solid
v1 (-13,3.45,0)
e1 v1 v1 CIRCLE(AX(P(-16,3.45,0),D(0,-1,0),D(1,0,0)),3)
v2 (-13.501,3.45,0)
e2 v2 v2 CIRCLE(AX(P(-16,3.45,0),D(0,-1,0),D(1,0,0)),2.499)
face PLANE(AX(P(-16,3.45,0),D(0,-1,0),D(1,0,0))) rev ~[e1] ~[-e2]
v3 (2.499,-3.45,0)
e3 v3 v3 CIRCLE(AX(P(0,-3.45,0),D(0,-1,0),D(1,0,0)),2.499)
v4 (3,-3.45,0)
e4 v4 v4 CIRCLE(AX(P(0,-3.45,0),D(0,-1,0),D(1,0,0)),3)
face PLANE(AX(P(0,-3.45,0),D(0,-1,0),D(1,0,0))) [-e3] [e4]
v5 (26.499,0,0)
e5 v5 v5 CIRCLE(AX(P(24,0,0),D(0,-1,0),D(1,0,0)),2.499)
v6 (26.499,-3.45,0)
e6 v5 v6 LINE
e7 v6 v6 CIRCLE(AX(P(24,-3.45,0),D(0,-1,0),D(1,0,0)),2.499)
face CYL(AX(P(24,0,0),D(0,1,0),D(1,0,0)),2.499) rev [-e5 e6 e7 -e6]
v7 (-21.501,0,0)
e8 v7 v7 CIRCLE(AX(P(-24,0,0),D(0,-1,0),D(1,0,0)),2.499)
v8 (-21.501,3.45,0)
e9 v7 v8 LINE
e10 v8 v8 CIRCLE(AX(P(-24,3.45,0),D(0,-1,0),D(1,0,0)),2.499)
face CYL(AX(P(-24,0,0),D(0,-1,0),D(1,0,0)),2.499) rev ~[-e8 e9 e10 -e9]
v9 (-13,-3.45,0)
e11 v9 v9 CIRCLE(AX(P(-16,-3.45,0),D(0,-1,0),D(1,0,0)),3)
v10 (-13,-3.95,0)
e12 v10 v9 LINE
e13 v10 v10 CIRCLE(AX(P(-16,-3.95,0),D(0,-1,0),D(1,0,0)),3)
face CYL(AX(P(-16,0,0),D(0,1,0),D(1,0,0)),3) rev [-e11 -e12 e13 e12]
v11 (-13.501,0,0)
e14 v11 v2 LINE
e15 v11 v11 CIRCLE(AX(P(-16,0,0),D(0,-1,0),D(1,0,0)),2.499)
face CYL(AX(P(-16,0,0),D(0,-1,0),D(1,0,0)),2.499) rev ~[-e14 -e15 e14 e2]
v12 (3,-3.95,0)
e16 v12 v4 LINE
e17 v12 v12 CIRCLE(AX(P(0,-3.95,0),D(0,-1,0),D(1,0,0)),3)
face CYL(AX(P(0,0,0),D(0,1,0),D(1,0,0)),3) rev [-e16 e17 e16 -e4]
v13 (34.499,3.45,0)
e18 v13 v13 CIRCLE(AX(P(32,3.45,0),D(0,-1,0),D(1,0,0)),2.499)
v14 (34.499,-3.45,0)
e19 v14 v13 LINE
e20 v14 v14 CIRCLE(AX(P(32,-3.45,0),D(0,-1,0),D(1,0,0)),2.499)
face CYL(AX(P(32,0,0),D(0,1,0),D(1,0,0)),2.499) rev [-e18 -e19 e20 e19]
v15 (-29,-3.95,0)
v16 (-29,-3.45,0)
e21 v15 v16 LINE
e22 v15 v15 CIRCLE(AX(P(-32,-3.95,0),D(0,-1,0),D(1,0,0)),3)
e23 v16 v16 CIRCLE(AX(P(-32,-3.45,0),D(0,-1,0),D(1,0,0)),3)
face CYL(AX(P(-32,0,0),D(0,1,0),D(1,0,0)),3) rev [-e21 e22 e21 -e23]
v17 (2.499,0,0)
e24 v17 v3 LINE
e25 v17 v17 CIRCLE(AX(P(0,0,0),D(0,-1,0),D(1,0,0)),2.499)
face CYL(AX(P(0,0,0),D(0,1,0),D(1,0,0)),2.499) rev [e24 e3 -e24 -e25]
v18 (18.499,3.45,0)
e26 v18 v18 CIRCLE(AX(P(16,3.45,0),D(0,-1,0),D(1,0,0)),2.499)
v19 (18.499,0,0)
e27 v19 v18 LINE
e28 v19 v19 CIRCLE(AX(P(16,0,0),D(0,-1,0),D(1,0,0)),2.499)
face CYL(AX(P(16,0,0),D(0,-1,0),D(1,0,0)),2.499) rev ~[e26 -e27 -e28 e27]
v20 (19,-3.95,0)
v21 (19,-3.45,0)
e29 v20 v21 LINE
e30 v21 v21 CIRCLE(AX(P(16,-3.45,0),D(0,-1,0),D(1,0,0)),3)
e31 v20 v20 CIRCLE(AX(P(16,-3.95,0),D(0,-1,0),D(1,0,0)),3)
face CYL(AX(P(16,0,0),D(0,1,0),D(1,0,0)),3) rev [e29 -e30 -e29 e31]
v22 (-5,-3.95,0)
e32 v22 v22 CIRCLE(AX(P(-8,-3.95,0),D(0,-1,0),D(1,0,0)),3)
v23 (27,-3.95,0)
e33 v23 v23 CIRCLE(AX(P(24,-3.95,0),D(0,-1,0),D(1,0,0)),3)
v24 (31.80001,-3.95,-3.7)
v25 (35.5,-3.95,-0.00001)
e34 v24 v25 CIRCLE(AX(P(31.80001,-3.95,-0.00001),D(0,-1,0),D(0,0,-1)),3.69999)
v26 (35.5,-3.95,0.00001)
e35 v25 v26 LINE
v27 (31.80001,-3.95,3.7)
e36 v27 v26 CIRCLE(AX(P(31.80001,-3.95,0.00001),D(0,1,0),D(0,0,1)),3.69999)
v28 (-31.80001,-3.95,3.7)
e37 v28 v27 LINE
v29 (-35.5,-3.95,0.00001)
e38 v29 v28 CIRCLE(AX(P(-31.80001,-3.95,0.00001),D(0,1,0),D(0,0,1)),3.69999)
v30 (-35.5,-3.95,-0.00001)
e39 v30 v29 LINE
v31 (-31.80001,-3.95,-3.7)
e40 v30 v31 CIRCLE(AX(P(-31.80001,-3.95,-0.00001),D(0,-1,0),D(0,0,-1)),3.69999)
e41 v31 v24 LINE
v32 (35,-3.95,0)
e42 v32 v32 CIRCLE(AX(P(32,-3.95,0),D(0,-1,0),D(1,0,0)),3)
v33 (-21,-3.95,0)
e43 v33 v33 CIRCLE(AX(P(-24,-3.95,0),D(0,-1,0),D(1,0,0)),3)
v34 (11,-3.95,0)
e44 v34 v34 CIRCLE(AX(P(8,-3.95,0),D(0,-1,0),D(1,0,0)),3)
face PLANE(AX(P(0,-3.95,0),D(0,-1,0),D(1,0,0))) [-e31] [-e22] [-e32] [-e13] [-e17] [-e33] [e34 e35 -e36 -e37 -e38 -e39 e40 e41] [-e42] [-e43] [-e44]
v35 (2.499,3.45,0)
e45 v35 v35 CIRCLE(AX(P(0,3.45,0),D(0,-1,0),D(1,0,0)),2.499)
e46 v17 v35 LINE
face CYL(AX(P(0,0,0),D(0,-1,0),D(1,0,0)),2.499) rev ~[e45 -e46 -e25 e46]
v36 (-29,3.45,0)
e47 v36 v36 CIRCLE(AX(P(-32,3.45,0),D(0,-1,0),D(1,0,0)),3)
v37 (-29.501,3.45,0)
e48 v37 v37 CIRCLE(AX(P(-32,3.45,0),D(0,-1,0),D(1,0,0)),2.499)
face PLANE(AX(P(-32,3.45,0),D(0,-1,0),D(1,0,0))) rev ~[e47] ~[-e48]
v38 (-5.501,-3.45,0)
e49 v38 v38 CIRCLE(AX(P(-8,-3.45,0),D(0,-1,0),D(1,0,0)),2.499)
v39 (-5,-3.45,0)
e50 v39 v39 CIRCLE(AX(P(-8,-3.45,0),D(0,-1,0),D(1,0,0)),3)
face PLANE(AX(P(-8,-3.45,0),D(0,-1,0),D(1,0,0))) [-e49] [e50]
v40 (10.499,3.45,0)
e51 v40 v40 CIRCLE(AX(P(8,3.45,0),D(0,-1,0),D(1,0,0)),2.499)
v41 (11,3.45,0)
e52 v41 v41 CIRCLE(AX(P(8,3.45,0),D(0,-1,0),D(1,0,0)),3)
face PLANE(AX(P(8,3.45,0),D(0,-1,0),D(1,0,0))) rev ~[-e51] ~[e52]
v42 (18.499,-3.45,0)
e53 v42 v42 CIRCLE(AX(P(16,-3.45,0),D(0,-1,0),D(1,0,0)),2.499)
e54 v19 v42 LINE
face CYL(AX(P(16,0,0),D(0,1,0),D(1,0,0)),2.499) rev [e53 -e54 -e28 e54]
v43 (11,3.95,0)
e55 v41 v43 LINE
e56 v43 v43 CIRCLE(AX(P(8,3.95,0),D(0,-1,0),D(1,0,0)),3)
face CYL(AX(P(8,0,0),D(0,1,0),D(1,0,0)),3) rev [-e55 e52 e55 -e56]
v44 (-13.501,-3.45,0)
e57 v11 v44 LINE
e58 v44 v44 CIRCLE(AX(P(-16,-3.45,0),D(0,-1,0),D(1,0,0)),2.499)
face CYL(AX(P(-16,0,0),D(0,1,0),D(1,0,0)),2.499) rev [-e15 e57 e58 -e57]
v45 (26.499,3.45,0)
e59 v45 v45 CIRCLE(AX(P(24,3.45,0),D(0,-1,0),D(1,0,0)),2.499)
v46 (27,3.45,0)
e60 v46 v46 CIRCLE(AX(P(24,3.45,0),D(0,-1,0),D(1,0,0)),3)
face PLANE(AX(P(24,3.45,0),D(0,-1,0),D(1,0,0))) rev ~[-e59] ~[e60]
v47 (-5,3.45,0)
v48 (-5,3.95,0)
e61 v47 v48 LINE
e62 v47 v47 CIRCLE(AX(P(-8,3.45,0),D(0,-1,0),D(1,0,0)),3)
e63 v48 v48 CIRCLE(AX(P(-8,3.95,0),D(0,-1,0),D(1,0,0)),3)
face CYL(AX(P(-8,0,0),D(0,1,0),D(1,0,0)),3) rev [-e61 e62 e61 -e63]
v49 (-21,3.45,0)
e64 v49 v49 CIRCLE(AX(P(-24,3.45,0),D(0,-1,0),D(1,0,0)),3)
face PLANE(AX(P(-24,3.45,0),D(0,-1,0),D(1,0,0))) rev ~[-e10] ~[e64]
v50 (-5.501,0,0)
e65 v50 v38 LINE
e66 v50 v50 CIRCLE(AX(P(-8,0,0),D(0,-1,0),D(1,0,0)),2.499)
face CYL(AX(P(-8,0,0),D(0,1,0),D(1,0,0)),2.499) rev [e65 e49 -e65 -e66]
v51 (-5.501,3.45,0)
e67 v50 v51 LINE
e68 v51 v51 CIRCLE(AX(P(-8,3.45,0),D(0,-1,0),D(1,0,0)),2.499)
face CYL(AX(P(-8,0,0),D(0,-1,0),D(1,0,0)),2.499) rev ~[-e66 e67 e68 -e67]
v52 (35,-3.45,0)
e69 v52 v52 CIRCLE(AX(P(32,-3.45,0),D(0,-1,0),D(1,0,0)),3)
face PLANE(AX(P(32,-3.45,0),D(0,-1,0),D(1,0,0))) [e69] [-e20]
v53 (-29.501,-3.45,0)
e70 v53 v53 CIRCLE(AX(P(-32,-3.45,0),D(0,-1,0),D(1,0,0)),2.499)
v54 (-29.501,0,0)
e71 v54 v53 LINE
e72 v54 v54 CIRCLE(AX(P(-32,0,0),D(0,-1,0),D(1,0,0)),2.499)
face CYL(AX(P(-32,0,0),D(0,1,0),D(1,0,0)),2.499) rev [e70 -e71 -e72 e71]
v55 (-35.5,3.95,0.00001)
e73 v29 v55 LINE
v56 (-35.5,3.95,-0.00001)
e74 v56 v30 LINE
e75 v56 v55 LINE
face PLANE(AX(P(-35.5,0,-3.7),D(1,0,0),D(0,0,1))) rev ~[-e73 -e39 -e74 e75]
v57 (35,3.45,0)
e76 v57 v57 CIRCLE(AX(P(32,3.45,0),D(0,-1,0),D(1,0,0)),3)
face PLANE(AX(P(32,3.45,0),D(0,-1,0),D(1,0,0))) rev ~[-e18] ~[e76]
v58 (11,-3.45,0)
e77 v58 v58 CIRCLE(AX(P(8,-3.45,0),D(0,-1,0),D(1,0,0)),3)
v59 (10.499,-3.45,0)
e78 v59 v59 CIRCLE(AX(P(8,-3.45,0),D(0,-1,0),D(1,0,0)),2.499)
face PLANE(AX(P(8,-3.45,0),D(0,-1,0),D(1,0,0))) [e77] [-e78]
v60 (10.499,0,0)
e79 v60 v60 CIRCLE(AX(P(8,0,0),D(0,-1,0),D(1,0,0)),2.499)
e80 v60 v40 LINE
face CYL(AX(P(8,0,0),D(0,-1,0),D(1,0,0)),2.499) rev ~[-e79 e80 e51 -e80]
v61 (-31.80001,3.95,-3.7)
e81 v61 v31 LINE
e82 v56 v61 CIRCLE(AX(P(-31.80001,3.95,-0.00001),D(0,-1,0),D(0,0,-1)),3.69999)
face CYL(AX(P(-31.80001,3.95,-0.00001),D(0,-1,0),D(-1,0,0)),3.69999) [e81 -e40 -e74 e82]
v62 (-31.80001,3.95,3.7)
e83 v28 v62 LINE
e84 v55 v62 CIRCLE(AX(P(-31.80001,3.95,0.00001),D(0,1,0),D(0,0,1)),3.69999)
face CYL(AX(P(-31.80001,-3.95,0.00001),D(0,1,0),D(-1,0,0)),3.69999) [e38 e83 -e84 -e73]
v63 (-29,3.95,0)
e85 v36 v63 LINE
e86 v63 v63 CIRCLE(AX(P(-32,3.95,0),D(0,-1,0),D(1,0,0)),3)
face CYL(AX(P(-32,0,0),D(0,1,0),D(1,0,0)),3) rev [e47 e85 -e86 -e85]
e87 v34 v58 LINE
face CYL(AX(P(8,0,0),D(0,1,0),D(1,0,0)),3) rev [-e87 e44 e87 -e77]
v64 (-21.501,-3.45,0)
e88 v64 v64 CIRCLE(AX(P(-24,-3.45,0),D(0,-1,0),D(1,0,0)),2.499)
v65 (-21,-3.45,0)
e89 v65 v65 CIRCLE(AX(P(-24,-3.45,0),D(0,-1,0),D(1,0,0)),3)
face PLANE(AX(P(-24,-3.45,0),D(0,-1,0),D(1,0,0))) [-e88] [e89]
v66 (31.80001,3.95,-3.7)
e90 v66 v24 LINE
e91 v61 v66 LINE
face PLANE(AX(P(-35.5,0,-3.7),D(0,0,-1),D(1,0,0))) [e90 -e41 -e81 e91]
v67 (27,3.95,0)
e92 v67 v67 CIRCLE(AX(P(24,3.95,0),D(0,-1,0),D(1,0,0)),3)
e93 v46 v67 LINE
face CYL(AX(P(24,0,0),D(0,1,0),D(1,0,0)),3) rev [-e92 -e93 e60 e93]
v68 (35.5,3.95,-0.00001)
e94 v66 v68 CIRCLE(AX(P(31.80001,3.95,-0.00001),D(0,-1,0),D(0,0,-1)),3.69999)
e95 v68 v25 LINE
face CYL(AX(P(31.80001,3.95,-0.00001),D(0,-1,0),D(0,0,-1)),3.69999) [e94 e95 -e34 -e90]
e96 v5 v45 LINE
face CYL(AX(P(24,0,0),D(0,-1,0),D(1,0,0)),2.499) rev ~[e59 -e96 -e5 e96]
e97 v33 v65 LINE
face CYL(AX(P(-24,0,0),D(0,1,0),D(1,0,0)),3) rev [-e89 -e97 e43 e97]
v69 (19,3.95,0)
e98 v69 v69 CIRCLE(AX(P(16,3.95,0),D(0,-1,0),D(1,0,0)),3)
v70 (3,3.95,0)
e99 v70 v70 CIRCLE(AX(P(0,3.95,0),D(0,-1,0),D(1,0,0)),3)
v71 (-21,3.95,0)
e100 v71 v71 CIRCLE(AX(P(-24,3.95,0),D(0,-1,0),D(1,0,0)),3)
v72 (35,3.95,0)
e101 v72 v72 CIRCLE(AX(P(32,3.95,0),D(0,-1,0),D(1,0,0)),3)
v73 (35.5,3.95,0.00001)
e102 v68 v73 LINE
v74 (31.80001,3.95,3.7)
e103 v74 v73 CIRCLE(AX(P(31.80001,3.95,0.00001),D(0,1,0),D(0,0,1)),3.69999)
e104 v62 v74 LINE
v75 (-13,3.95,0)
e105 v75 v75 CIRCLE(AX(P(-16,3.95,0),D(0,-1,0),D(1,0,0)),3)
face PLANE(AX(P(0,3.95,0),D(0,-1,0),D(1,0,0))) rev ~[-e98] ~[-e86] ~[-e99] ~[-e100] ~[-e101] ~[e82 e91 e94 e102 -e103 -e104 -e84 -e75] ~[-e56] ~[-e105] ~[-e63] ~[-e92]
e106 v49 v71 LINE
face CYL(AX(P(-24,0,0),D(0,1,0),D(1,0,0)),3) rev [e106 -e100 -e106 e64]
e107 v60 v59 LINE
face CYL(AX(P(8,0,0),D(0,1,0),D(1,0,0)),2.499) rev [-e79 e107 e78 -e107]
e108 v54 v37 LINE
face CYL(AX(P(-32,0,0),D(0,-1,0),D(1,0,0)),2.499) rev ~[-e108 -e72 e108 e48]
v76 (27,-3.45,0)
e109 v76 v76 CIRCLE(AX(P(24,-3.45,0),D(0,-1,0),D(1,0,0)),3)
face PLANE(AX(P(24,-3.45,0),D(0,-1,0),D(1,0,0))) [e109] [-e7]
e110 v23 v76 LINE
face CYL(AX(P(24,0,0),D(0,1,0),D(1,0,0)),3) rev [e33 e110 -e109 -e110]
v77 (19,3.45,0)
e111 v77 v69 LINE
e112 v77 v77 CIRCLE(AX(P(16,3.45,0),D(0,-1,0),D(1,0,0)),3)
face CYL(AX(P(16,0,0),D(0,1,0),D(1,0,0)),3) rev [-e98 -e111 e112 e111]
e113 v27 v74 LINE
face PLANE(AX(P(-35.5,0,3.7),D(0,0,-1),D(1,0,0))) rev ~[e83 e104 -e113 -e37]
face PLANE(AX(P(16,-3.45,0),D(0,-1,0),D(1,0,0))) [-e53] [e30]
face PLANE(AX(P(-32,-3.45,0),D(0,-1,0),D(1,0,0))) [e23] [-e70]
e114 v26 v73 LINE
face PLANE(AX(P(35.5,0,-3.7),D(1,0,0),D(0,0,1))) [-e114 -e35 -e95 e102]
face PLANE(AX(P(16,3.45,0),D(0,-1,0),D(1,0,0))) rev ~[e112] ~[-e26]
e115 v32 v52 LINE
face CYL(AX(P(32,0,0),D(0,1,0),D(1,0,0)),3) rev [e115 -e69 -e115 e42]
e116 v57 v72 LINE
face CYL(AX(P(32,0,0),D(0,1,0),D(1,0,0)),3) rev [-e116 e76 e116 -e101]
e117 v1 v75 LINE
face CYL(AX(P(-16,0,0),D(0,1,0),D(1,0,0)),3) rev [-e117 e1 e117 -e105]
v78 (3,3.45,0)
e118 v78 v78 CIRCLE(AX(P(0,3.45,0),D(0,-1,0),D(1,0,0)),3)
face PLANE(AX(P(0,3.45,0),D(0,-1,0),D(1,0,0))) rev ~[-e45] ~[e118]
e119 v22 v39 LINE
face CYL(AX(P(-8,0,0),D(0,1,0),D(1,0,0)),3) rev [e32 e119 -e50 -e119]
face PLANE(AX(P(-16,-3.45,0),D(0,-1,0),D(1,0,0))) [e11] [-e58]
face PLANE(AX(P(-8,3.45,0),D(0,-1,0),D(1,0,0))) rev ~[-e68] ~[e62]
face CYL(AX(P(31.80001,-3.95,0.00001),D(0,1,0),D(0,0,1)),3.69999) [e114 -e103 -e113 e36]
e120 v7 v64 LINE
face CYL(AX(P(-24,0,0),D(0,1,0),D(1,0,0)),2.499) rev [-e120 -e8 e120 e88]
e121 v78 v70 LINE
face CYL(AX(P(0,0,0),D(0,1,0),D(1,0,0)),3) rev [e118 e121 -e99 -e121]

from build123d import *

# Parameters (mm, degrees)
F0_W     = 71
F0_H     = 7.4
F0_R     = 3
F1_DEPTH = 3.95
F0_R_2   = 2.499
F2_DEPTH = 3.45
F3_R     = 3.69999


# Not quite as in the source:
# - a fillet or chamfer is up to 0.001 mm smaller than in the source, because OpenCascade refuses the exact size


with BuildPart() as f1:
    # F0 (on Front) → F1 (new body, symmetric)
    with BuildSketch(Plane.XZ):
        Rectangle(F0_W, F0_H)
        with Locations((-32, 0)):
            Circle(F0_R, mode=Mode.SUBTRACT)
        with Locations((-24, 0)):
            Circle(F0_R, mode=Mode.SUBTRACT)
        with Locations((-16, 0)):
            Circle(F0_R, mode=Mode.SUBTRACT)
        with Locations((-8, 0)):
            Circle(F0_R, mode=Mode.SUBTRACT)
        Circle(F0_R, mode=Mode.SUBTRACT)
        with Locations((8, 0)):
            Circle(F0_R, mode=Mode.SUBTRACT)
        with Locations((16, 0)):
            Circle(F0_R, mode=Mode.SUBTRACT)
        with Locations((24, 0)):
            Circle(F0_R, mode=Mode.SUBTRACT)
        with Locations((32, 0)):
            Circle(F0_R, mode=Mode.SUBTRACT)
    extrude(amount=F1_DEPTH, both=True)

    # F0 (on Front) → F2 (join, symmetric)
    with BuildSketch(Plane.XZ):
        with Locations((-32, 0)):
            Circle(F0_R)
        with Locations((-32, 0)):
            Circle(F0_R_2, mode=Mode.SUBTRACT)
        with Locations((-24, 0)):
            Circle(F0_R)
        with Locations((-24, 0)):
            Circle(F0_R_2, mode=Mode.SUBTRACT)
        with Locations((-16, 0)):
            Circle(F0_R)
        with Locations((-16, 0)):
            Circle(F0_R_2, mode=Mode.SUBTRACT)
        with Locations((-8, 0)):
            Circle(F0_R)
        with Locations((-8, 0)):
            Circle(F0_R_2, mode=Mode.SUBTRACT)
        Circle(F0_R)
        Circle(F0_R_2, mode=Mode.SUBTRACT)
        with Locations((8, 0)):
            Circle(F0_R)
        with Locations((8, 0)):
            Circle(F0_R_2, mode=Mode.SUBTRACT)
        with Locations((16, 0)):
            Circle(F0_R)
        with Locations((16, 0)):
            Circle(F0_R_2, mode=Mode.SUBTRACT)
        with Locations((24, 0)):
            Circle(F0_R)
        with Locations((24, 0)):
            Circle(F0_R_2, mode=Mode.SUBTRACT)
        with Locations((32, 0)):
            Circle(F0_R)
        with Locations((32, 0)):
            Circle(F0_R_2, mode=Mode.SUBTRACT)
    extrude(amount=F2_DEPTH, both=True)

    # F3 (radius 3.7 in the source; OpenCascade refuses exactly that, so slightly less here)
    f3_edges = [f1.edges().sort_by_distance(p)[0] for p in [
        (-35.5, 0, 3.7),
        (-35.5, 0, -3.7),
        (35.5, 0, 3.7),
        (35.5, 0, -3.7),
    ]]
    fillet(f3_edges, radius=F3_R)


solid = f1.part
